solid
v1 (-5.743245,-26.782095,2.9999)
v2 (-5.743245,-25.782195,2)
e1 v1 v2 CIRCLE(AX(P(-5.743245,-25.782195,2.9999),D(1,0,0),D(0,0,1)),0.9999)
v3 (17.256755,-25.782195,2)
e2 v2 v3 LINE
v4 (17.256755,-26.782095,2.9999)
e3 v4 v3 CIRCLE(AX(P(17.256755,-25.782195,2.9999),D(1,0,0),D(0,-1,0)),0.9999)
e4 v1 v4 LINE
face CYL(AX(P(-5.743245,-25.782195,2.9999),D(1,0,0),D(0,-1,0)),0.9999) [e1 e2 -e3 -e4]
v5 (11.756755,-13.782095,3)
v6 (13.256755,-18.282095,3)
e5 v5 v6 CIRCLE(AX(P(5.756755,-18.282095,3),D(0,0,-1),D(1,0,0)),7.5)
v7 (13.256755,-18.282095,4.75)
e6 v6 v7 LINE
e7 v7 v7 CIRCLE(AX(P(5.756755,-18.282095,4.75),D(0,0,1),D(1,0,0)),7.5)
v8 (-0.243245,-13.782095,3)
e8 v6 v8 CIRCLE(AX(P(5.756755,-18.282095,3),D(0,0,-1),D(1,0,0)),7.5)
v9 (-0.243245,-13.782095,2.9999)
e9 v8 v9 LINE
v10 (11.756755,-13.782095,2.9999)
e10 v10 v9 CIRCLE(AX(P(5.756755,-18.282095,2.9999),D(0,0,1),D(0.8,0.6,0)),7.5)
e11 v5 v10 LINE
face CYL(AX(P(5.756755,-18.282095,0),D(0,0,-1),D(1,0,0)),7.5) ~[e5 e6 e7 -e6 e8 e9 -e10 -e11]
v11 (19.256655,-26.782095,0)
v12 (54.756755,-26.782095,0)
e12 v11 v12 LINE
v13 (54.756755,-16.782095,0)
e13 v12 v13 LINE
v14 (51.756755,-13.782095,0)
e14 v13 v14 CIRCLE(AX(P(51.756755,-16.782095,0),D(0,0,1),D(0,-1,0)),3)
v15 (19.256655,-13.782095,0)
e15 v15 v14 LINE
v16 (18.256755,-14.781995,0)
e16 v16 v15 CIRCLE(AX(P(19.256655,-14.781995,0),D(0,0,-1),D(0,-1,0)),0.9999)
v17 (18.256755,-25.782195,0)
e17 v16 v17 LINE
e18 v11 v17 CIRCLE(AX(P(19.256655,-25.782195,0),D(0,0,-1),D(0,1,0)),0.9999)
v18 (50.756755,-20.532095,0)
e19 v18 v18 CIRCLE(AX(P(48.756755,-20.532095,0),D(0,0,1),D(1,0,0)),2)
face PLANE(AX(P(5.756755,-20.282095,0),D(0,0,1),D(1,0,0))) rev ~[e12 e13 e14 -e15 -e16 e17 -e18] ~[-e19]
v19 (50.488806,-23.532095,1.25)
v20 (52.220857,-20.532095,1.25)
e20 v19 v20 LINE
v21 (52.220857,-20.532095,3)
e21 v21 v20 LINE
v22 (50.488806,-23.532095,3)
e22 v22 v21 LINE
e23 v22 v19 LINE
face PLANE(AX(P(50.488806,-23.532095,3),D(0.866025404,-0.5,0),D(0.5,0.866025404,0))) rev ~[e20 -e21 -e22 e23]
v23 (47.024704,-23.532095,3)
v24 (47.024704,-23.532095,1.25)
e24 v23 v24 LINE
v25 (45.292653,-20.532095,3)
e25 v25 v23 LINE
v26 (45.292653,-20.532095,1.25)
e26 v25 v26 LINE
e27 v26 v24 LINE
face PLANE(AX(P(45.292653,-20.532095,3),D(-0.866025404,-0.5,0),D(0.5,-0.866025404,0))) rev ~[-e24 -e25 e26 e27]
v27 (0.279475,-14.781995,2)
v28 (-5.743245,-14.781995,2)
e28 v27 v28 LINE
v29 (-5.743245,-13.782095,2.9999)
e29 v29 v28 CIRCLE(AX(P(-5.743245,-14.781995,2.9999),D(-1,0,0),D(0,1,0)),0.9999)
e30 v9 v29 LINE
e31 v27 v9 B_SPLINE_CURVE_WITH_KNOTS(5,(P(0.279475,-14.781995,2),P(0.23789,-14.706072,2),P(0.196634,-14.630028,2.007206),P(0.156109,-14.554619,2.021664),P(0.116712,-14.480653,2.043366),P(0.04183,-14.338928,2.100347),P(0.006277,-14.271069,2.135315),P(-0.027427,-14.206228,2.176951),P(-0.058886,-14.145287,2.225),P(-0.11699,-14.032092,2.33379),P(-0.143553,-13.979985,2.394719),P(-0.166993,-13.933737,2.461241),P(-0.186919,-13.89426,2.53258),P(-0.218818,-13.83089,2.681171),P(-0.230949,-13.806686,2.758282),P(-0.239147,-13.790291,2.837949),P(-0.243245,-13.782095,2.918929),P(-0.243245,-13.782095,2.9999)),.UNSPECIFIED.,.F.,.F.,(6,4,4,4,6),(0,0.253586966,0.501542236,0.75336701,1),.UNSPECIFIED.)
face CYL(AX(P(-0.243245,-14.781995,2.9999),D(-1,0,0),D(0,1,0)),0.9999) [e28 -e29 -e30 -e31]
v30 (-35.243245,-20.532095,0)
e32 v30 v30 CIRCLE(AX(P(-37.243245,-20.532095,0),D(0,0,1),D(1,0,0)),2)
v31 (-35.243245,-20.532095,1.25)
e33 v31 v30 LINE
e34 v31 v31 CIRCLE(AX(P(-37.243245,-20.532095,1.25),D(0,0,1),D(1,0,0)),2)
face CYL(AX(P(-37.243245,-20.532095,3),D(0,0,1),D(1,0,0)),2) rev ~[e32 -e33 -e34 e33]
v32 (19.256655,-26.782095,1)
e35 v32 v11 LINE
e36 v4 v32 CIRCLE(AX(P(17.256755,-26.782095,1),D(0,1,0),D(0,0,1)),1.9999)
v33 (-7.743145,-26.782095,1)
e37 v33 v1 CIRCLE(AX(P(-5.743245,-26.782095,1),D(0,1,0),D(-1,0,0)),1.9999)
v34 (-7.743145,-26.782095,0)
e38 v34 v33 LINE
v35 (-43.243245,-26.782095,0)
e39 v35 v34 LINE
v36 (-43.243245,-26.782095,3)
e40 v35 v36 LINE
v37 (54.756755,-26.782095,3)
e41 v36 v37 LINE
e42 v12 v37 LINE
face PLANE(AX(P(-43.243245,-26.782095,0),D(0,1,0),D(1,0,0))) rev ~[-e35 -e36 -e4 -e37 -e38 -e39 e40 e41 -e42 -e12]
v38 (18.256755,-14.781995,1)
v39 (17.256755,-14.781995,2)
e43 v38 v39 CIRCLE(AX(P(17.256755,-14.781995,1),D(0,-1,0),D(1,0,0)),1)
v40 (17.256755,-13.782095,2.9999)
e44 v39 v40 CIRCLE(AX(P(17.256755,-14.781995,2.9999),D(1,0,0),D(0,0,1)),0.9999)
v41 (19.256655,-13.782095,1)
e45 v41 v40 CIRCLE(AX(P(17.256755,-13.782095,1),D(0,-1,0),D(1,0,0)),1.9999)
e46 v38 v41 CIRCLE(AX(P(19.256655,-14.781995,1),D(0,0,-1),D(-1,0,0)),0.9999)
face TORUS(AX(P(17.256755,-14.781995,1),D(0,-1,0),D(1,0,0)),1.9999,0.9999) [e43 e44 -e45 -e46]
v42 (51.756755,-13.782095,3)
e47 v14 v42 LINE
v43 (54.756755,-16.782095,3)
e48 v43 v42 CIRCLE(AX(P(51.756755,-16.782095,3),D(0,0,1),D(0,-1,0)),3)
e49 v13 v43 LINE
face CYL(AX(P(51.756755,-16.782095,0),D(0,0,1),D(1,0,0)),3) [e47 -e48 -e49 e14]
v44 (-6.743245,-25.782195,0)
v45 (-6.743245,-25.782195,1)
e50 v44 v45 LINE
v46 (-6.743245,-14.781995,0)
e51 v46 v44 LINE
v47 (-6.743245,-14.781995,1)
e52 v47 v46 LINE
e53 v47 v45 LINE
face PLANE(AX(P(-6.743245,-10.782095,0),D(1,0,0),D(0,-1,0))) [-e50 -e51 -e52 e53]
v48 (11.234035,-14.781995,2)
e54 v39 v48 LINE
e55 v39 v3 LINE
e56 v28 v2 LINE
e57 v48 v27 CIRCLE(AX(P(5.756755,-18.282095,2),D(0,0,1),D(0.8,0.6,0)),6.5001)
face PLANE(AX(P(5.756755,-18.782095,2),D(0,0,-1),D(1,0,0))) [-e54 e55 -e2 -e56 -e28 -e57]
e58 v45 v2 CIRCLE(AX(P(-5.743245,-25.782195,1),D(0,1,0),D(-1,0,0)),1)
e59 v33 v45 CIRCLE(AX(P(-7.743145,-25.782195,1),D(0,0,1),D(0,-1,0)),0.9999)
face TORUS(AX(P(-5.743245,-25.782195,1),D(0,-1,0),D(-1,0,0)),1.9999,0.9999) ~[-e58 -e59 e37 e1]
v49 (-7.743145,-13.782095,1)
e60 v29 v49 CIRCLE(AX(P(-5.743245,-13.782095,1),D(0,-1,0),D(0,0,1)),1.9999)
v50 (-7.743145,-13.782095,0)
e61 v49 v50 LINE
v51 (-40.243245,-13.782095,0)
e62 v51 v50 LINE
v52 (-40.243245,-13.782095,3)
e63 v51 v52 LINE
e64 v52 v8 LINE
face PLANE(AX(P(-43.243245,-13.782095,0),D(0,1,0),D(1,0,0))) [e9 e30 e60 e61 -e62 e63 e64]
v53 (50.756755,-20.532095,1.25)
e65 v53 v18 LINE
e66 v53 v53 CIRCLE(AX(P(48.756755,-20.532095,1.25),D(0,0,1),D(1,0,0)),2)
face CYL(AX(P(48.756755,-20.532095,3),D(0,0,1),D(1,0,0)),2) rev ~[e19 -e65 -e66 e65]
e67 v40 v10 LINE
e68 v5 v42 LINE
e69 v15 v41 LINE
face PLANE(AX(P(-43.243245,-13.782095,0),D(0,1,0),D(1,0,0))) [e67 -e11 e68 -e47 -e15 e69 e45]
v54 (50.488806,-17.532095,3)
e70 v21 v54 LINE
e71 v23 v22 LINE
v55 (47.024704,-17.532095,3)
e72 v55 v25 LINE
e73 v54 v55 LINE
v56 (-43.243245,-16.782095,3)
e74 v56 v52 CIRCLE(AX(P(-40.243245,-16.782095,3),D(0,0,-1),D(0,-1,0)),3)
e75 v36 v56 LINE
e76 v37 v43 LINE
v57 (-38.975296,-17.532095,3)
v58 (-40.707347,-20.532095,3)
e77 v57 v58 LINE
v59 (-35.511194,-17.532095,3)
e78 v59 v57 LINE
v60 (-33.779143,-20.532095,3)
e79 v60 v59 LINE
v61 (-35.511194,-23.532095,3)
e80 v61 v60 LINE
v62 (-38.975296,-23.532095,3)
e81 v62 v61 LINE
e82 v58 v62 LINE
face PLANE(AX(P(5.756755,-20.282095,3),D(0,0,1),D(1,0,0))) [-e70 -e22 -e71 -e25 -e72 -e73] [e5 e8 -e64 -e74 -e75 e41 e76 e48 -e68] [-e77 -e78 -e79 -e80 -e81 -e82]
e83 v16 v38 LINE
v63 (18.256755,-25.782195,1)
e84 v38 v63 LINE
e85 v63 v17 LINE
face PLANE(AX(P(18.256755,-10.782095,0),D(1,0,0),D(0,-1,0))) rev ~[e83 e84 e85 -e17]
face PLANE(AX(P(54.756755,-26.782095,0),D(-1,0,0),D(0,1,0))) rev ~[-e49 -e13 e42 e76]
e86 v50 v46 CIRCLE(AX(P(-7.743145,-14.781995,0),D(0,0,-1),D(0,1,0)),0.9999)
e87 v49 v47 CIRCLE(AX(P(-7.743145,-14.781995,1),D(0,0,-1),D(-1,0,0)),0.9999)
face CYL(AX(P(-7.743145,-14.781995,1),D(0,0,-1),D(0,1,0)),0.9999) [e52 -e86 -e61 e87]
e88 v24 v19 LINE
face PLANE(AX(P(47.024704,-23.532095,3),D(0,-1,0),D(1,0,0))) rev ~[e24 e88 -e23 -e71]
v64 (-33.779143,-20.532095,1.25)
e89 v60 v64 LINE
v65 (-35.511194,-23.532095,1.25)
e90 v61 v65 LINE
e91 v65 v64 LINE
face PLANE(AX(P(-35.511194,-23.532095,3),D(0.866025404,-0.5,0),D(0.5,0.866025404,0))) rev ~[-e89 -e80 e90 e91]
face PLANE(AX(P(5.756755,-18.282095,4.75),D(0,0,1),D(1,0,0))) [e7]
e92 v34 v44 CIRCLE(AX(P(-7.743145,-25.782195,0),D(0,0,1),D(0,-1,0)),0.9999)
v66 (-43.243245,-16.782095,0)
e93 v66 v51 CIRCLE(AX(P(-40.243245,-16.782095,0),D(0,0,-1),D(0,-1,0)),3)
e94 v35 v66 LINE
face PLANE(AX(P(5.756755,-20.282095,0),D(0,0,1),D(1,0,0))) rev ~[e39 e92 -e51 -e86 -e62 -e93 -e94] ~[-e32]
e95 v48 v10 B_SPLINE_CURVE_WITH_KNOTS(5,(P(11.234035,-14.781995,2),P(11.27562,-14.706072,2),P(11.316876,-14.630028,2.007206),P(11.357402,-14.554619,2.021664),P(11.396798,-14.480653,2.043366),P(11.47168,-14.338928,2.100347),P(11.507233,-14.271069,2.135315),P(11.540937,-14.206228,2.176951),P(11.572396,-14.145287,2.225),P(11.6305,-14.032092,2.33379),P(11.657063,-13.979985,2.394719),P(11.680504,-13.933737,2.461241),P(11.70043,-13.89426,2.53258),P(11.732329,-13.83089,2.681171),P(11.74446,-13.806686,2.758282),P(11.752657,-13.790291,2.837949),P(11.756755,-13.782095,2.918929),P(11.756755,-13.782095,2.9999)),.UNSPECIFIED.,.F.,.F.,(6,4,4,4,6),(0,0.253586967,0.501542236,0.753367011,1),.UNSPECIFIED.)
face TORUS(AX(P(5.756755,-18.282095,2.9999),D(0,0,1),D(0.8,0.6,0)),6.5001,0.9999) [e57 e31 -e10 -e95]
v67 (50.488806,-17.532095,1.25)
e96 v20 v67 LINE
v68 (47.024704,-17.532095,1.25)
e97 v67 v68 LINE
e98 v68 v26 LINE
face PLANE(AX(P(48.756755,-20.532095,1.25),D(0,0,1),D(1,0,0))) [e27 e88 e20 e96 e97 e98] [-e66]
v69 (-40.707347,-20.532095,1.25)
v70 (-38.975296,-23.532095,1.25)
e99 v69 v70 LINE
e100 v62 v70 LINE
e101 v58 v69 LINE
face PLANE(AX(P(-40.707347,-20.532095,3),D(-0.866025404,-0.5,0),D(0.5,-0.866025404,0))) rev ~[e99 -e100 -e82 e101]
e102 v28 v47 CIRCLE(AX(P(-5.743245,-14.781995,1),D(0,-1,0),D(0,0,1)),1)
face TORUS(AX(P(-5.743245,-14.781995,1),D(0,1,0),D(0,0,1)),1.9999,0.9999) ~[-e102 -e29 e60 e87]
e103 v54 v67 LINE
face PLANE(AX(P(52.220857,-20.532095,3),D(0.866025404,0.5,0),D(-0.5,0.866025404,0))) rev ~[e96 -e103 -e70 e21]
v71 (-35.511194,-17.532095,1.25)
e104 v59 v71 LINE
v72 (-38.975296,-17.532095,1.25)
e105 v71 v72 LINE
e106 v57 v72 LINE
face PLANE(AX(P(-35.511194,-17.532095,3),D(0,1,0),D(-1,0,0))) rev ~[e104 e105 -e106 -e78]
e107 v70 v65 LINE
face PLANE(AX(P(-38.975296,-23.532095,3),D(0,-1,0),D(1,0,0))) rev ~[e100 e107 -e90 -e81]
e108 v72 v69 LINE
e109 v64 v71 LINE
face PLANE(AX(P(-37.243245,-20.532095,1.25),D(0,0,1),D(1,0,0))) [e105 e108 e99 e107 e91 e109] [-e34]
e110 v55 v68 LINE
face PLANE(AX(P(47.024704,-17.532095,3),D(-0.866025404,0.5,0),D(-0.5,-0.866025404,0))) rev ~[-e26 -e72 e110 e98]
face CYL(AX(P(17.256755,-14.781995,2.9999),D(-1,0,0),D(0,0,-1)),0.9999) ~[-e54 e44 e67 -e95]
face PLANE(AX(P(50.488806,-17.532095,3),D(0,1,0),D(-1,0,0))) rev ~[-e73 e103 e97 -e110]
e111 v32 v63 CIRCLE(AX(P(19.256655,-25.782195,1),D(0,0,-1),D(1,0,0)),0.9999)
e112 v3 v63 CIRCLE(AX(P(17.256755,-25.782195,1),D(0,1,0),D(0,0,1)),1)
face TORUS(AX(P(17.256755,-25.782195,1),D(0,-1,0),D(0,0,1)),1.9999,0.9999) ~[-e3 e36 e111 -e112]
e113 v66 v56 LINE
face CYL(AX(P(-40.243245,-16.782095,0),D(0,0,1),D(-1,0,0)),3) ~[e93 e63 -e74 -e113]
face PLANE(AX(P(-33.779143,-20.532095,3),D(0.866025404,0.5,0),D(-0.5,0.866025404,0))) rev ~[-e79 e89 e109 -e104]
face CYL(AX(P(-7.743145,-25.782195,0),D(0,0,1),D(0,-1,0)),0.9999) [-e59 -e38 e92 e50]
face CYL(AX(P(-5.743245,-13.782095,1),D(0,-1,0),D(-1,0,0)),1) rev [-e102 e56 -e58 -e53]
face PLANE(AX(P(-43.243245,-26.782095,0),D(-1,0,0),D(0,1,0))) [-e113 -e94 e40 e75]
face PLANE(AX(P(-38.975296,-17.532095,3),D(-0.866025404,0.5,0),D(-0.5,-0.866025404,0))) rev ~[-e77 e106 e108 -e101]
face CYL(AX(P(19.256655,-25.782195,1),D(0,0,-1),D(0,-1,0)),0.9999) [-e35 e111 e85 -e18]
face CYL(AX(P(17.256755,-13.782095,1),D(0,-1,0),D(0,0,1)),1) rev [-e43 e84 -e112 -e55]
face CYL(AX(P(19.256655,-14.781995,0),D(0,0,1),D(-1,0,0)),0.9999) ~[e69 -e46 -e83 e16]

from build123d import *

# Parameters (mm, degrees)
F0_W      = 98
F0_H      = 13
F1_DEPTH  = 3
F2_R      = 3
F3_R      = 2
F4_DEPTH  = 20
F5_R      = 7.5
F6_DEPTH  = 4.75
F8_DEPTH  = 1.75
F9_W      = 25
F9_H      = 16
F10_DEPTH = 2
F11_F1_R  = 1
F11_F2_R  = 0.9999


# Not quite as in the source:
# - a fillet or chamfer is up to 0.001 mm smaller than in the source, because OpenCascade refuses the exact size


with BuildPart() as f1:
    # F0 (on Top) → F1 (new body)
    with BuildSketch(Plane.XY):
        with Locations((5.7567551136, -20.2820947109)):
            Rectangle(F0_W, F0_H)
    extrude(amount=F1_DEPTH)

    # F2
    f2_edges = [f1.edges().sort_by_distance(p)[0] for p in [
        (-43.243245, -13.782095, 1.5),
        (54.756755, -13.782095, 1.5),
    ]]
    fillet(f2_edges, radius=F2_R)

    # F3 (on face) → F4 (cut)
    with BuildSketch(Plane.XY.offset(3)):
        with Locations((48.7567551136, -20.5320947109)):
            Circle(F3_R)
        with Locations((-37.2432448864, -20.5320947109)):
            Circle(F3_R)
    extrude(amount=-F4_DEPTH, mode=Mode.SUBTRACT)

    # F5 (on Top) → F6 (join)
    with BuildSketch(Plane.XY):
        with Locations((5.7567551136, -18.2820947109)):
            Circle(F5_R)
    extrude(amount=F6_DEPTH)

    # F7 (on face) → F8 (cut)
    with BuildSketch(Plane.XY.offset(3)):
        Polygon((-33.7791432713, -20.5320947109), (-35.5111940788, -17.5320947109), (-38.975295694, -17.5320947109), (-40.7073465015, -20.5320947109), (-38.975295694, -23.5320947109), (-35.5111940788, -23.5320947109), align=None)
        Polygon((50.4888059212, -17.5320947109), (47.024704306, -17.5320947109), (45.2926534985, -20.5320947109), (47.024704306, -23.5320947109), (50.4888059212, -23.5320947109), (52.2208567287, -20.5320947109), align=None)
    extrude(amount=-F8_DEPTH, mode=Mode.SUBTRACT)

    # F9 (on face) → F10 (cut)
    with BuildSketch(Plane(origin=(0, 0, 0), x_dir=(1, 0, 0), z_dir=(0, 0, -1))):
        with Locations((5.7567551136, 18.7820947109)):
            Rectangle(F9_W, F9_H)
    extrude(amount=-F10_DEPTH, mode=Mode.SUBTRACT)

    # F11: fillet of radius 1 on 6 edges, made by hand

    # F11_f1
    f11_f1_edges = [f1.edges().sort_by_distance(p)[0] for p in [
        (18.2567551136, -20.2820947109, 2),
        (-6.7432448864, -20.2820947109, 2),
    ]]
    fillet(f11_f1_edges, radius=F11_F1_R)

    # F11_f2 (radius 1 in the source; OpenCascade refuses exactly that, so slightly less here)
    f11_f2_edges = [f1.edges().sort_by_distance(p)[0] for p in [
        (14.5067551136, -13.7820947109, 2),
        (5.7567551136, -10.7820947109, 2),
        (-2.9932448864, -13.7820947109, 2),
        (5.7567551136, -26.7820947109, 2),
        (17.9638618948, -26.7820947109, 1.7071067812),
        (-6.4503516676, -26.7820947109, 1.7071067812),
        (-6.4503516676, -13.7820947109, 1.7071067812),
        (17.9638618948, -13.7820947109, 1.7071067812),
    ]]
    fillet(f11_f2_edges, radius=F11_F2_R)


solid = f1.part
